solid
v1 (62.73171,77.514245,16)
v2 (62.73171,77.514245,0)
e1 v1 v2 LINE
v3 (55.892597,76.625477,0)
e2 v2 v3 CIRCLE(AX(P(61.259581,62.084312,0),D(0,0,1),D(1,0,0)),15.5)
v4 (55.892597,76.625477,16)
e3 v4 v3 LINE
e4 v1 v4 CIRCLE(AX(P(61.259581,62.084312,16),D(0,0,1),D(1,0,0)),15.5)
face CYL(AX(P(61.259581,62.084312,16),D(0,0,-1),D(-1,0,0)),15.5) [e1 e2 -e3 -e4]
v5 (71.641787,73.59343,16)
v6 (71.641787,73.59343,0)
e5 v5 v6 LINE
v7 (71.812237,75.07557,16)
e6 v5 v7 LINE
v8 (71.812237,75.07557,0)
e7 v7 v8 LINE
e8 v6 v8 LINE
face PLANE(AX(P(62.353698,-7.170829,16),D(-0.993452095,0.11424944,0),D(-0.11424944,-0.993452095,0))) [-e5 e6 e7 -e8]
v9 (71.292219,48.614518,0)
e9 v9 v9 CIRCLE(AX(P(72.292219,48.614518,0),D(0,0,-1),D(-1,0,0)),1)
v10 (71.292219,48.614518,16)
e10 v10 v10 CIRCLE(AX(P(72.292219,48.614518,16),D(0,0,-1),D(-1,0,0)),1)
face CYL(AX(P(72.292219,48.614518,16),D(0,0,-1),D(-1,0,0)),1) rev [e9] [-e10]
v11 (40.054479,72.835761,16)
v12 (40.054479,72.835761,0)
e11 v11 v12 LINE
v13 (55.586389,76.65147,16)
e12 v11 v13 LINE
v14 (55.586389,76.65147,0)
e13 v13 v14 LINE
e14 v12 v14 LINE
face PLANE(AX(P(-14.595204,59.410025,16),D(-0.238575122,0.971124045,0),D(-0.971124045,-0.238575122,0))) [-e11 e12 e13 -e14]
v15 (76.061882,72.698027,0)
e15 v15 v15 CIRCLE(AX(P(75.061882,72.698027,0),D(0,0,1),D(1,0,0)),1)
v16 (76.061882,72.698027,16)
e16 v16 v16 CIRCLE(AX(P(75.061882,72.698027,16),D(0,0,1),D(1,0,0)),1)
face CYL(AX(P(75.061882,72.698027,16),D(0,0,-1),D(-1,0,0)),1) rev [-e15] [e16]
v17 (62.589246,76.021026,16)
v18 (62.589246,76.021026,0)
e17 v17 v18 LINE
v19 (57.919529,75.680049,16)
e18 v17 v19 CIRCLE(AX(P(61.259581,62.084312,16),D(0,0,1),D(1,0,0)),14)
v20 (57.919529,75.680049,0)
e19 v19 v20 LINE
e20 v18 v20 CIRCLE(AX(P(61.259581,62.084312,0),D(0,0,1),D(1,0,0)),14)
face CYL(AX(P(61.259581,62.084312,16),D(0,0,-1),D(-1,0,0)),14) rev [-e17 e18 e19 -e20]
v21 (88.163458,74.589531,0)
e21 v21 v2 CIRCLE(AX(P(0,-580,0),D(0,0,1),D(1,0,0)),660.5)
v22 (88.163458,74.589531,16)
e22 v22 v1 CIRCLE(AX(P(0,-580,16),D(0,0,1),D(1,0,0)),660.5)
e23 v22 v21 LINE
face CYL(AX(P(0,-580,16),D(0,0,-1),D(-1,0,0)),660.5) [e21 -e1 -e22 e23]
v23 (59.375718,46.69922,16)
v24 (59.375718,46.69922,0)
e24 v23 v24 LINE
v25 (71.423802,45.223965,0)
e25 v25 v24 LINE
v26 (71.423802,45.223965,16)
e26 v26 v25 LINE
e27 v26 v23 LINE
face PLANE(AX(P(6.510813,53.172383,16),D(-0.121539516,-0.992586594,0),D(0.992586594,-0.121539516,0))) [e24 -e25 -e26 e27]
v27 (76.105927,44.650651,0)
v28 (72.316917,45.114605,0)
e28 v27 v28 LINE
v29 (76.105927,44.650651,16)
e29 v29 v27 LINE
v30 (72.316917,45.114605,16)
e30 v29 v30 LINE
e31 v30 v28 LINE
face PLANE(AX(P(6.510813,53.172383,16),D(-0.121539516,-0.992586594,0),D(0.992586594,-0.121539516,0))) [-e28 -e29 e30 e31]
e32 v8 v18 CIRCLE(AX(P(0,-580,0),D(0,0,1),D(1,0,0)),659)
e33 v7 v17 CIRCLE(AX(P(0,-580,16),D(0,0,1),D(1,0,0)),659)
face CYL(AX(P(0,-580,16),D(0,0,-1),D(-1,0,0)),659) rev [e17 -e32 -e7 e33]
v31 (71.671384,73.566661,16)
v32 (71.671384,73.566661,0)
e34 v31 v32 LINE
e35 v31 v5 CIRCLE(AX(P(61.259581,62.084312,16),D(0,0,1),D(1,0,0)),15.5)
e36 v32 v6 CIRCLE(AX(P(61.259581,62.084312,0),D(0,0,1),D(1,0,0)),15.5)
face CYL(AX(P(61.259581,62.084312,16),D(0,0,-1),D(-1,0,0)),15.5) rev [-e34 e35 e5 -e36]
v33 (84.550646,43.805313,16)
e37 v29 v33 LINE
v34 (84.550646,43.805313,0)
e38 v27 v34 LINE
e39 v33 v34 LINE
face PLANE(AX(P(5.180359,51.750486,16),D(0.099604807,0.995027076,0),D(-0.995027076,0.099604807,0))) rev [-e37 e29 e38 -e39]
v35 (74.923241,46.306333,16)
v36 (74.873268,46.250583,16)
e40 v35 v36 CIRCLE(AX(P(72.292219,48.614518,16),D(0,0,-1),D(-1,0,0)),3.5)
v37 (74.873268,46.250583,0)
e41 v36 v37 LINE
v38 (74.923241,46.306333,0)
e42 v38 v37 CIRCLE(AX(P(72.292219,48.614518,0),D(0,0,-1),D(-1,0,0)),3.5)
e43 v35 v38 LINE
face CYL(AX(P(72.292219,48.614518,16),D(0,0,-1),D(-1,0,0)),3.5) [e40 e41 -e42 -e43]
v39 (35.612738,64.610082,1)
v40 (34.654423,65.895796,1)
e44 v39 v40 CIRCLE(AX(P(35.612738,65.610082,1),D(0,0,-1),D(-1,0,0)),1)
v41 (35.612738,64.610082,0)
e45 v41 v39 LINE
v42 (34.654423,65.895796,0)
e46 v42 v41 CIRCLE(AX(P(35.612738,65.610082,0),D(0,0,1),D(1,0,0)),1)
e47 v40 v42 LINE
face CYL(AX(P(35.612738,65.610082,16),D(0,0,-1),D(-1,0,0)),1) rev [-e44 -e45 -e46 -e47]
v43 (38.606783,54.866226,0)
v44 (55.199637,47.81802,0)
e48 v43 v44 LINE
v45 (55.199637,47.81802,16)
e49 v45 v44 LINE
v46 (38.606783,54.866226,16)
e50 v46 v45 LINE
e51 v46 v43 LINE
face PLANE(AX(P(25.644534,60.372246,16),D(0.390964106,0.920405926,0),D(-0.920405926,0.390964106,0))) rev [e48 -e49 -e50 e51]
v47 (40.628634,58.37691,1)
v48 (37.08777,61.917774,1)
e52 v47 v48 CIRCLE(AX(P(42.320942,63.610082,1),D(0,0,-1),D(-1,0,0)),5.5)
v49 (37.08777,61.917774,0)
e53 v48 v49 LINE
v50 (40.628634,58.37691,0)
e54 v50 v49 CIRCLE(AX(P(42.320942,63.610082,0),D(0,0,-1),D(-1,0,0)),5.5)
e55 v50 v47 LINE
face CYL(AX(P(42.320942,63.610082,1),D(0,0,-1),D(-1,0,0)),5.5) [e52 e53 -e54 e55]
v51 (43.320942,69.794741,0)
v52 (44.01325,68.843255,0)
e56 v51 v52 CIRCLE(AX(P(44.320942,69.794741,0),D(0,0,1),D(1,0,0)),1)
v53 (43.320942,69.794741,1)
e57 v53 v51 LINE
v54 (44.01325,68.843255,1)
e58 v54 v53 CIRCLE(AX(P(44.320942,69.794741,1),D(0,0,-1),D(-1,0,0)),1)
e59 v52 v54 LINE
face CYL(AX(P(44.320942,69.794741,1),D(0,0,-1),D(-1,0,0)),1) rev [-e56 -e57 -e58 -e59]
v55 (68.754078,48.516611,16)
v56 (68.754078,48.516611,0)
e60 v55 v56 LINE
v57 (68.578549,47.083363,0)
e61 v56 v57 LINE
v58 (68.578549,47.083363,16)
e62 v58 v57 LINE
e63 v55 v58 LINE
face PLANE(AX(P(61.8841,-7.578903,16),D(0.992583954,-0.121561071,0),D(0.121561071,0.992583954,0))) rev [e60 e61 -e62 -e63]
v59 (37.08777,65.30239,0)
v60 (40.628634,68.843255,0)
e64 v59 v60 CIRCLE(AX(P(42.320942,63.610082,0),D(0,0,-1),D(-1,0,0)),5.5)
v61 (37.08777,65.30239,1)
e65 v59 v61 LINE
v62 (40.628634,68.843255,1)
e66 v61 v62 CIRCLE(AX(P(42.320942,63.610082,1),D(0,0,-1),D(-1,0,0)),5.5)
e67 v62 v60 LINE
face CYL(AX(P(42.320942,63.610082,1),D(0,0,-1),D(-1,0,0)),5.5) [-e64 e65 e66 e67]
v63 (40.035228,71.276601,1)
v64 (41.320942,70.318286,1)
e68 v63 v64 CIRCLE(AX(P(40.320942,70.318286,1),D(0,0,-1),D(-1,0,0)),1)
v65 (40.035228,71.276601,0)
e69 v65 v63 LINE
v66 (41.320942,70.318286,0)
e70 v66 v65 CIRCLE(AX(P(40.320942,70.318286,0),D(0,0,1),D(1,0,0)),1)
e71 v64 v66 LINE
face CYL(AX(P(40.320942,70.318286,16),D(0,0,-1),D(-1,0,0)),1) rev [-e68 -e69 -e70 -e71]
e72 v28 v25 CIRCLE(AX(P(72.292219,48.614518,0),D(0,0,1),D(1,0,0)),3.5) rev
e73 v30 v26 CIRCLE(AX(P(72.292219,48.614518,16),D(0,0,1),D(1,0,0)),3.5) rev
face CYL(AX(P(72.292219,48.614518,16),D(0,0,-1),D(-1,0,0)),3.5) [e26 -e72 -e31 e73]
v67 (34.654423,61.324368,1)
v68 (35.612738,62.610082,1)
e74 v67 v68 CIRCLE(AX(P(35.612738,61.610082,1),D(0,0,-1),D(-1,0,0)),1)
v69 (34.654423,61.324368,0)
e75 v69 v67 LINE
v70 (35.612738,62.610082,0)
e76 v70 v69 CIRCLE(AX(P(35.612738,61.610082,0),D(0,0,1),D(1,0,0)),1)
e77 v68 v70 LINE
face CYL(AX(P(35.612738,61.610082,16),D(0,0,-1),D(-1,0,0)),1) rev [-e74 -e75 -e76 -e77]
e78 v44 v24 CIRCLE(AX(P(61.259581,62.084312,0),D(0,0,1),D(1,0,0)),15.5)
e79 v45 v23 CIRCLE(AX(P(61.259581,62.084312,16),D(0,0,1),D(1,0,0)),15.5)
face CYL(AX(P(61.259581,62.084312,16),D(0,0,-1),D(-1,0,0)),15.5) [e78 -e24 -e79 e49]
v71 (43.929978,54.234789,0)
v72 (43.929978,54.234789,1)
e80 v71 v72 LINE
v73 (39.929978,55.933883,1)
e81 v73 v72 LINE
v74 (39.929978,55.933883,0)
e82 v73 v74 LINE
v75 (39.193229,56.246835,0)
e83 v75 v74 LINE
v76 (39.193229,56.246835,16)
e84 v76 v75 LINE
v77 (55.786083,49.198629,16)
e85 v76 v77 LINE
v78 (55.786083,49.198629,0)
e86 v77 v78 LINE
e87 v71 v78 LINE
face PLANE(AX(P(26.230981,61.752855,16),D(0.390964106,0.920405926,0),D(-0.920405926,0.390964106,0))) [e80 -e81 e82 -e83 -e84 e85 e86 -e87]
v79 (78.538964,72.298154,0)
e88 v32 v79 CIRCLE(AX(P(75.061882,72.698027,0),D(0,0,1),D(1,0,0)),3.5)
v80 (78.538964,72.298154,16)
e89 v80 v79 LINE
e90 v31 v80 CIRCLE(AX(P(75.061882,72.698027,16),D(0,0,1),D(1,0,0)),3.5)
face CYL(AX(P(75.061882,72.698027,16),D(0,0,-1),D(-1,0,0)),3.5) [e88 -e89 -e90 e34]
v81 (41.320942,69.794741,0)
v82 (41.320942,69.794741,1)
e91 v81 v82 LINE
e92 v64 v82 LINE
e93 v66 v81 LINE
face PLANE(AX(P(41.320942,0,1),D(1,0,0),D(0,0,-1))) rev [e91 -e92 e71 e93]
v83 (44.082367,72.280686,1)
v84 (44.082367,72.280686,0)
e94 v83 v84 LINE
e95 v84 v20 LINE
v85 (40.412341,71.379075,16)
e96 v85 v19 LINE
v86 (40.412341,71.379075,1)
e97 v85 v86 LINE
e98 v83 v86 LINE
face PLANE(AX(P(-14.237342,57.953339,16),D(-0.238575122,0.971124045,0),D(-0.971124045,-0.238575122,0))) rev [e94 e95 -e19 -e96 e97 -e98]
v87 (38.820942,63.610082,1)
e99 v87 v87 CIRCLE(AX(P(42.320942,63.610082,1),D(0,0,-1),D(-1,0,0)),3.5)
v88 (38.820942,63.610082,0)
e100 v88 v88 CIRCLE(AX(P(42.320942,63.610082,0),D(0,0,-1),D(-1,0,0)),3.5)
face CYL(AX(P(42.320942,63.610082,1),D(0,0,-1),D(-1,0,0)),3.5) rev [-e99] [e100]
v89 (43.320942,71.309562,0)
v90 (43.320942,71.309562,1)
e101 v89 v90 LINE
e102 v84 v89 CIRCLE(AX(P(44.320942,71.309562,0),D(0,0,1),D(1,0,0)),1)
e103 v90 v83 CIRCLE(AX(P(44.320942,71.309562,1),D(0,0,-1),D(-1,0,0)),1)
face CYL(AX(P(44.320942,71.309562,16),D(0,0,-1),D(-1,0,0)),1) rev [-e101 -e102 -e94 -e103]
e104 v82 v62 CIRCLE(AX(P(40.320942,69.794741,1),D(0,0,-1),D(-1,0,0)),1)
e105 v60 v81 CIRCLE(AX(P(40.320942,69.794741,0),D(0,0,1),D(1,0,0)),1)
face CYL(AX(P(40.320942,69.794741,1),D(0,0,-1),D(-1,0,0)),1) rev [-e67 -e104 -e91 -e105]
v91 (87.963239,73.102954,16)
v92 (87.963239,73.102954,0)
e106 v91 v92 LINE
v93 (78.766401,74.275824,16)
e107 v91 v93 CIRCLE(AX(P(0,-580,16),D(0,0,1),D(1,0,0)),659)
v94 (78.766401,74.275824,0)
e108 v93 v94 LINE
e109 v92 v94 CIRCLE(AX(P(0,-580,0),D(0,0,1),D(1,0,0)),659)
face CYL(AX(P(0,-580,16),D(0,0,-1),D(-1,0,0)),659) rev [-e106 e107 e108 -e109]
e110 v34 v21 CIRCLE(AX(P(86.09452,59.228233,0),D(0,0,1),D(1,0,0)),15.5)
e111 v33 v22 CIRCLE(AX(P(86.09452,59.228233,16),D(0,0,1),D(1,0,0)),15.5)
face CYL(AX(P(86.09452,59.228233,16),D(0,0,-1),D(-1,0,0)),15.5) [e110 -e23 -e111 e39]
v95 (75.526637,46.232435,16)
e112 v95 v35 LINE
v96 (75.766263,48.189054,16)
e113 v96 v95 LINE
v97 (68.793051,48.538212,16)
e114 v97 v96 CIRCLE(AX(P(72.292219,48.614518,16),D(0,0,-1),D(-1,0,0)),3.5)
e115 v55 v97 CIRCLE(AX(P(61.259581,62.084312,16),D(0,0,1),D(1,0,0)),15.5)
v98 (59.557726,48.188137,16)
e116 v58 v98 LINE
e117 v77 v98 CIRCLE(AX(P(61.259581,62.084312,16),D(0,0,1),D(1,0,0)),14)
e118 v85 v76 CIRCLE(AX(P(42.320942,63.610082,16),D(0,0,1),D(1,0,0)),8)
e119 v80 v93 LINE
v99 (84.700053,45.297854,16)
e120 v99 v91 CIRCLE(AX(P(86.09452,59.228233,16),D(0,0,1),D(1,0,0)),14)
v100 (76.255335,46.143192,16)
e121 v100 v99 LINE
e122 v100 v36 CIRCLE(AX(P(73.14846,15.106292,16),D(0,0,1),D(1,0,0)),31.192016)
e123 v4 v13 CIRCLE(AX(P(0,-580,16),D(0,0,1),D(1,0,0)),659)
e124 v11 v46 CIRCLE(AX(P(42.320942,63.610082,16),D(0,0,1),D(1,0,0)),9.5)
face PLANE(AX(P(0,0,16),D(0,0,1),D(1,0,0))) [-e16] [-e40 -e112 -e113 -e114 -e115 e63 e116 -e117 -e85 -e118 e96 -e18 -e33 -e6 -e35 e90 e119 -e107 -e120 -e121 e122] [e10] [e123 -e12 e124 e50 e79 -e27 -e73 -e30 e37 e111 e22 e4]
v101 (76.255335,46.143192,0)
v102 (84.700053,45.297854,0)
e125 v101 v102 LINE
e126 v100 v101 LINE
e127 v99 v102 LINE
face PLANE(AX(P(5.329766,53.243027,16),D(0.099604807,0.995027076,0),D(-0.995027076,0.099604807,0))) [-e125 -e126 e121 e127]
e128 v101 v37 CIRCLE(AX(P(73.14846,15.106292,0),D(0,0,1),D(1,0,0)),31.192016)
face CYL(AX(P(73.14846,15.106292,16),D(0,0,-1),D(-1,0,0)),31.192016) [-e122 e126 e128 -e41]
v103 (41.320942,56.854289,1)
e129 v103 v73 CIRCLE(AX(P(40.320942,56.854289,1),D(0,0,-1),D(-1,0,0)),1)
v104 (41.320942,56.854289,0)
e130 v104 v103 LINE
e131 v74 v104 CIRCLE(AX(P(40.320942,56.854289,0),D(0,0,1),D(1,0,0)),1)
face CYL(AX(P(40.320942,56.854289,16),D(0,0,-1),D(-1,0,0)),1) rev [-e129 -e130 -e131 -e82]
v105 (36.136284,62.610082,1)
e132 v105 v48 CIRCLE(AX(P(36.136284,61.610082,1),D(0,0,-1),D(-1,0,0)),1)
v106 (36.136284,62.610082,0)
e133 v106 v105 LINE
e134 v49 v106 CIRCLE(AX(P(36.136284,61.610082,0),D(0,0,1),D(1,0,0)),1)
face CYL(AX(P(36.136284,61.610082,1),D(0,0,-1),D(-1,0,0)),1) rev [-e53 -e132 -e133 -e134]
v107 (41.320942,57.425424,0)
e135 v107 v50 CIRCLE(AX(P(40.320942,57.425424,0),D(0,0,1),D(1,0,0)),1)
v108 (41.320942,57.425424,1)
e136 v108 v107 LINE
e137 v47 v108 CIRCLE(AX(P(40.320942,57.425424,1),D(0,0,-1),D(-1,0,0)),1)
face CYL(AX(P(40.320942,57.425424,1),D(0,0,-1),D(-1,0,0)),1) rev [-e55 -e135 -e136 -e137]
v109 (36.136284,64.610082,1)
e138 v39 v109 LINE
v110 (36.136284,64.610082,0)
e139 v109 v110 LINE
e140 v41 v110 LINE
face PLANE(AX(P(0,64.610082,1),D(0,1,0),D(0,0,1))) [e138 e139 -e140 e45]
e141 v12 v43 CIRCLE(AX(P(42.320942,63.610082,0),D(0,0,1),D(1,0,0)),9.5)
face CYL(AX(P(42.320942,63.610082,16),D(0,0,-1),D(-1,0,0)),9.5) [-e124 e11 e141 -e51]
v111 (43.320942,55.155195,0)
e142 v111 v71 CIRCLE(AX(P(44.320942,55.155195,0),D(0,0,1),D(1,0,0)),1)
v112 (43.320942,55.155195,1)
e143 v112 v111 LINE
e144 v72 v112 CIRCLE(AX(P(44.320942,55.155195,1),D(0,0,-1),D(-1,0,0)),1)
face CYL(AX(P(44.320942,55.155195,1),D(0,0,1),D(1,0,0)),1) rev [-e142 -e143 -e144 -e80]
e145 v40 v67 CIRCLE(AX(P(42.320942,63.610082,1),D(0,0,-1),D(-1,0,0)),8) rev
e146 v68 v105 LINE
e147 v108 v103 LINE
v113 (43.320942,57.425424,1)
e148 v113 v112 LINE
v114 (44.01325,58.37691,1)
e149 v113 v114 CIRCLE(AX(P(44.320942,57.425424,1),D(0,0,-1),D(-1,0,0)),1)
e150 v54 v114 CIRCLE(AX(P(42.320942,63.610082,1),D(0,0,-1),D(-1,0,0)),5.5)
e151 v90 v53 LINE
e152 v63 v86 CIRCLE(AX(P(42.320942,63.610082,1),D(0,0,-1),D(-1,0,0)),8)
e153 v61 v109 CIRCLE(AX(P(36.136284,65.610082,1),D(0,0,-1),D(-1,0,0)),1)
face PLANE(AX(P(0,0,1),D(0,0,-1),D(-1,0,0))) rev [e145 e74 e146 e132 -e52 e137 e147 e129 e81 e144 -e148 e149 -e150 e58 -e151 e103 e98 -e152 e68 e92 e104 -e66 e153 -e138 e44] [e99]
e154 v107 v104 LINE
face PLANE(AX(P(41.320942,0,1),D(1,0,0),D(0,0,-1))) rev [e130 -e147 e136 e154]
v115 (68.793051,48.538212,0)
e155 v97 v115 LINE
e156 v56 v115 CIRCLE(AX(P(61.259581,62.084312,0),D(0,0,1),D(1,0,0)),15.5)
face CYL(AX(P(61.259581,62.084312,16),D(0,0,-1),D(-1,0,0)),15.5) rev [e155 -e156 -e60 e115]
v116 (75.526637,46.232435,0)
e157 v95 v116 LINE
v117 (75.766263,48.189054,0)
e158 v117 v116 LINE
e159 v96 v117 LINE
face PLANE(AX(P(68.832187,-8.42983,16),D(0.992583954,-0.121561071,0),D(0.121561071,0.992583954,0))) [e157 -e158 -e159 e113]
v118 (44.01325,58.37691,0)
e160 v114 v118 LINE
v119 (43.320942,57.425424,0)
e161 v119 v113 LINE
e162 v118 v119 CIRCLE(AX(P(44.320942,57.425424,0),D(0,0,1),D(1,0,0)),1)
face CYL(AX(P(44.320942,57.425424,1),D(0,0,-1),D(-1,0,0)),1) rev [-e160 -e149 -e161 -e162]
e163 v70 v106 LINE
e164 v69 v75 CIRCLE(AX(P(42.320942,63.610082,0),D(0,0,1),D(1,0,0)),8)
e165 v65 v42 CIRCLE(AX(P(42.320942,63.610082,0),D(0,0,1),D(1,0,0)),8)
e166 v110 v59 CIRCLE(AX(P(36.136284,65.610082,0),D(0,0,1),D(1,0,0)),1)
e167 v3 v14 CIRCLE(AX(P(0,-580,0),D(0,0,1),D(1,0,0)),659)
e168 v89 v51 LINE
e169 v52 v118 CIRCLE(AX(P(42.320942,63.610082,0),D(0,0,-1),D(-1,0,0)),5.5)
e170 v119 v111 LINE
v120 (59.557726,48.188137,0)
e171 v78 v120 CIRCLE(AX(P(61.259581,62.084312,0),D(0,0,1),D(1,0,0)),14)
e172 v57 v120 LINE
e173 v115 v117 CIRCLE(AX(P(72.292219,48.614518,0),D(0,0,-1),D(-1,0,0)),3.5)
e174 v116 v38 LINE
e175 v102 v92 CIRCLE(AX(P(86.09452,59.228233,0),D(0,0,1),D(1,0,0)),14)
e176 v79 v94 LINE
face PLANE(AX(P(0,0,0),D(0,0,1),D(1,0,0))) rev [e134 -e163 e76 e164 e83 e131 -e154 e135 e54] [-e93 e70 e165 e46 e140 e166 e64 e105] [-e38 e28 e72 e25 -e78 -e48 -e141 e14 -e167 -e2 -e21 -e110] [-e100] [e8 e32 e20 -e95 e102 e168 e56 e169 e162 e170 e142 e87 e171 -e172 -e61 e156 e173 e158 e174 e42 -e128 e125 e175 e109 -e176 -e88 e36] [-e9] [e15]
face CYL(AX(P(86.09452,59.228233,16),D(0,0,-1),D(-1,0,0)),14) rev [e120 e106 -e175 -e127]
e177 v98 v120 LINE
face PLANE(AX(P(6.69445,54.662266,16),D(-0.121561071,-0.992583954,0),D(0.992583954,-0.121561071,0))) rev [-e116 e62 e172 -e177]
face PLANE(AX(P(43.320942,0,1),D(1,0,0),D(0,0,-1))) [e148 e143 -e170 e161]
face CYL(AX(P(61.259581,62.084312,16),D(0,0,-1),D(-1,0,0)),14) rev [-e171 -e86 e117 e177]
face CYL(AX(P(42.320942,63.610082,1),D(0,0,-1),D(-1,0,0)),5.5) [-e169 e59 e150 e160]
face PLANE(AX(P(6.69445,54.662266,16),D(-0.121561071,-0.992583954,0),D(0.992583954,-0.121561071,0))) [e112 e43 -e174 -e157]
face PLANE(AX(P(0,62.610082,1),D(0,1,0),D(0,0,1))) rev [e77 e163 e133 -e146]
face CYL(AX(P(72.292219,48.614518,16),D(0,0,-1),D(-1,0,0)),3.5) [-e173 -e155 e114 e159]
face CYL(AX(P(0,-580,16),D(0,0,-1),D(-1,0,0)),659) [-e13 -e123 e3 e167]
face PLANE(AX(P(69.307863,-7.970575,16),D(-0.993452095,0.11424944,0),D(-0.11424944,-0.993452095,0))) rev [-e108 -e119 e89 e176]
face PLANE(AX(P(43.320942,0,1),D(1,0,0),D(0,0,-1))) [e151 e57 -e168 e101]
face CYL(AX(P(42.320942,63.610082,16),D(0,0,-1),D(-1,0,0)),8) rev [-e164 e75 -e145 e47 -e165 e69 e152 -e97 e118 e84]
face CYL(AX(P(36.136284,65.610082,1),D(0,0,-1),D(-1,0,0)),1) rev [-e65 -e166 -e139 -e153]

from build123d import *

# Parameters (mm, degrees)
SKETCH1_R           = 0.9999999999999983
SKETCH1_R_2         = 0.9999999999999925
BOSS_EXTRUDE1_DEPTH = 16
SKETCH2_R           = 3.500000000000001
BOSS_EXTRUDE3_DEPTH = 1
FILLET1_R           = 1


with BuildPart() as part:
    # Sketch1 → Boss-Extrude1 (new body)
    with BuildSketch(Plane.XY):
        with BuildLine():
            ThreePointArc((55.89259723337368, 76.62547740283708), (55.73949455446561, 76.6384916731646), (55.58638884526515, 76.65147024516648))
            Line((55.586388845264466, 76.65147024517492), (40.05447850145701, 72.83576058817667))
            ThreePointArc((40.054478501457005, 72.83576058817668), (32.85162294085296, 64.37296720932677), (38.606783148321924, 54.86622586508078))
            Line((38.60678314832193, 54.86622586508078), (55.19963694216289, 47.81802020858516))
            ThreePointArc((55.19963694216289, 47.81802020858516), (57.2484781716781, 47.11230292338465), (59.37571808447544, 46.69921985208524))
            Line((59.375718084475444, 46.69921985208528), (71.42380227491209, 45.2239648632993))
            ThreePointArc((71.42380227491209, 45.22396486329929), (71.86683077979774, 45.14046516807511), (72.31691713492577, 45.1146053890486))
            Line((72.31691713492577, 45.11460538904862), (76.10592748748196, 44.65065142451647))
            Line((76.10592748748196, 44.65065142451647), (84.55064590566833, 43.80531307650732))
            ThreePointArc((84.55064590566833, 43.805313076507325), (101.48886829968637, 57.421563726672275), (88.16345849536586, 74.58953137529774))
            ThreePointArc((88.16345849536584, 74.58953137529784), (75.46175434404655, 76.17510896963688), (62.73170883439283, 77.5142452500271))
            ThreePointArc((62.73170883439284, 77.5142452500271), (59.262094380223, 77.45506508921636), (55.89259723337367, 76.62547740283709))
        make_face()
        with BuildLine():
            ThreePointArc((59.557725585447635, 48.18813669728694), (57.63650253765193, 48.561246371899415), (55.78608310126676, 49.19862909689187))
            Line((55.78608310126676, 49.19862909689187), (39.19322930742587, 56.24683475338757))
            ThreePointArc((39.19322930742587, 56.246834753387574), (34.34677860639931, 64.25251167485804), (40.41234118375017, 71.37907452020546))
            Line((40.41234118375017, 71.37907452020545), (57.91952888483379, 75.68004868881708))
            ThreePointArc((57.91952888483379, 75.6800486888171), (60.24003267144862, 76.04713848925702), (62.589247617854994, 76.02102564066264))
            ThreePointArc((62.589247617854994, 76.02102564066263), (67.20240478832663, 75.56451764159874), (71.81223656797964, 75.07557020476702))
            Line((71.81223656797964, 75.07557020476696), (71.64178678398153, 73.59342993840335))
            ThreePointArc((71.64178678398147, 73.59342993840333), (71.65659417306406, 73.58005511327626), (71.67138433211107, 73.56666123728807))
            ThreePointArc((71.67138433211102, 73.56666123728805), (74.42615226207305, 69.25624682134095), (78.53896424094067, 72.29815352793712))
            Line((78.53896424094067, 72.29815352793712), (78.76640123459923, 74.2758241266035))
            ThreePointArc((78.76640123459923, 74.27582412660365), (83.36688258884593, 73.70556283958138), (87.96323868046352, 73.10295408981267))
            ThreePointArc((87.96323868046352, 73.10295408981273), (99.9990926972691, 57.59640266524784), (84.70005311557539, 45.2978536909054))
            Line((84.70005311557539, 45.29785369090539), (76.25533469738902, 46.14319203891454))
            ThreePointArc((76.25533469738902, 46.14319203891455), (75.56489776696996, 46.20456627537837), (74.87326752192872, 46.25058318457722))
            ThreePointArc((74.87326752192874, 46.25058318457718), (74.89840357996093, 46.278324250051526), (74.92324149301305, 46.306332573854725))
            Line((74.92324149301308, 46.30633257385466), (75.52663710324227, 46.23243513010978))
            Line((75.52663710324227, 46.2324351301098), (75.76626292593124, 48.189054495825076))
            ThreePointArc((75.76626292593126, 48.189054495825076), (72.46724927571279, 52.11013899674976), (68.79305098926964, 48.53821211065343))
            ThreePointArc((68.79305098926967, 48.53821211065338), (68.77357245948804, 48.527397725244626), (68.75407840556292, 48.51661134884714))
            Line((68.75407840556268, 48.51661134884727), (68.57854942467414, 47.08336263050453))
            Line((68.57854942467414, 47.08336263050455), (59.55772558544767, 48.18813669728721))
        make_face(mode=Mode.SUBTRACT)
        with Locations((75.06188190763086, 72.69802656701884)):
            Circle(SKETCH1_R, mode=Mode.SUBTRACT)
        with Locations(Location((72.29221908664718, 48.614518246022456, 0), (0, 0, 180))):
            Circle(SKETCH1_R_2, mode=Mode.SUBTRACT)
    extrude(amount=BOSS_EXTRUDE1_DEPTH)

    # Sketch2 → Boss-Extrude3 (add)
    with BuildSketch(Plane(origin=(0, 0, 0), x_dir=(-1, 0, 0), z_dir=(0, 0, -1))):
        with BuildLine():
            Line((-34.38368822278696, 64.61008215769137), (-36.91261524278492, 64.61008215769137))
            ThreePointArc((-36.91261524278492, 64.61008215769137), (-38.431854859454894, 67.49916945421737), (-41.3209421559809, 69.01840907088734))
            Line((-41.3209421559809, 69.01840907088734), (-41.3209421559809, 71.60228965777424))
            Line((-41.3209421559809, 71.60228965777424), (-43.3209421559809, 72.09362775753603))
            Line((-43.3209421559809, 72.09362775753601), (-43.3209421559809, 69.01840907088734))
            ThreePointArc((-43.3209421559809, 69.01840907088734), (-47.8209421559809, 63.61008215769136), (-43.3209421559809, 58.201755244495374))
            Line((-43.3209421559809, 58.20175524449537), (-43.3209421559809, 54.49349145216626))
            Line((-43.320942155980916, 54.493491452166296), (-41.3209421559809, 55.343038581800116))
            Line((-41.3209421559809, 55.343038581800116), (-41.3209421559809, 58.20175524449537))
            ThreePointArc((-41.3209421559809, 58.201755244495374), (-38.431854859454894, 59.72099486116535), (-36.91261524278492, 62.61008215769136))
            Line((-36.91261524278492, 62.61008215769136), (-34.38368822278692, 62.61008215769136))
            ThreePointArc((-34.383688222786944, 62.6100821576915), (-34.32094215598073, 63.61008215769144), (-34.38368822278696, 64.61008215769137))
        make_face()
        with Locations((-42.3209421559809, 63.61008215769136)):
            Circle(SKETCH2_R, mode=Mode.SUBTRACT)
    extrude(amount=-BOSS_EXTRUDE3_DEPTH)

    # Fillet1
    # the kernel refuses this fillet: 1 mm, written as the material it adds along each edge
    with BuildSketch(Plane(origin=(43.3209421559809, 69.01840907088734, 0), x_dir=(0, 1, 0), z_dir=(0, 0, 1))) as fillet1_piece_1:
        with BuildLine():
            CenterArc((0.7763315252305034, -1), FILLET1_R, 90, 72.07978686060775)
            ThreePointArc((-0.17515438837357067, -0.6923076923076934), (-0.07632915836303766, -0.3489996080267872), (0, 0))
            Line((0, 0), (0.7763315252305034, 0))
        make_face()
    extrude(amount=1)
    with BuildSketch(Plane(origin=(43.3209421559809, 72.09362775753601, 0), x_dir=(0.9711240453142455, 0.23857512152882837, 0), z_dir=(0, 0, 1))) as fillet1_piece_2:
        with BuildLine():
            CenterArc((FILLET1_R * 0.784065518865, -FILLET1_R), FILLET1_R, 90.00000000000067, 76.19754186301965)
            Line((-FILLET1_R * 0.18705852645, -FILLET1_R * 0.761424878471), (0, 0))
            Line((0, 0), (FILLET1_R * 0.784065518865, 0))
        make_face()
    extrude(amount=1)
    with BuildSketch(Plane(origin=(41.3209421559809, 71.60228965777424, 0), x_dir=(-0.9693820258646232, -0.24555750432556298, 0), z_dir=(0, 0, 1))) as fillet1_piece_3:
        with BuildLine():
            CenterArc((1.2846787374655042, 0.9991324752357655), FILLET1_R, 165.78521711475895, 106.60154959902064)
            Line((0.31529671160088446, 1.2446899795613422), (0.21835850901442075, 1.2692457299938988))
            Line((0.21835850901442075, 1.2692457299938988), (-0.0969382025864637, 0.02455575043255665))
            Line((-0.0969382025864637, 0.02455575043255665), (-0.00071963623293713, -0.09999741058494188))
            ThreePointArc((-0.00071963623293713, -0.09999741058494188), (0.9348739670397286, -0.10673045549363312), (1.3304881173388574, -0.09991324752357857))
            Line((1.3304881173388574, -0.09991324752357857), (1.3263236282594648, 2e-17))
        make_face()
    extrude(amount=1)
    with BuildSketch(Plane(origin=(34.38368822278696, 64.61008215769137, 0), x_dir=(0.20605308678190415, 0.9785408143903089, 0), z_dir=(0, 0, 1))) as fillet1_piece_4:
        with BuildLine():
            CenterArc((1.2317903608426914, -0.9966225018240038), FILLET1_R, 85.28960309121933, 106.60154959901973)
            Line((0.25324954645238257, -1.202675588605908), (0, 0))
            ThreePointArc((0, 0), (0.6569548591160989, 0.02701998540798078), (1.3139097182321993, 1e-17))
        make_face()
    extrude(amount=1)
    with BuildSketch(Plane(origin=(34.38368822278693, 62.61008215769143, 0), x_dir=(0.206053086781914, -0.9785408143903069, 0), z_dir=(0, 0, 1))) as fillet1_piece_5:
        with BuildLine():
            CenterArc((1.231790360842777, 0.9966225018240046), FILLET1_R, 168.10884730976036, 106.60154959901973)
            Line((0.2532495464524701, 1.2026755886059186), (0, 0))
            ThreePointArc((0, 0), (0.6569548591161378, -0.02701998540797386), (1.3139097182322748, -1e-17))
        make_face()
    extrude(amount=1)
    with BuildSketch(Plane(origin=(41.3209421559809, 58.201755244495374, 0), x_dir=(0, -1, 0), z_dir=(0, 0, 1))) as fillet1_piece_6:
        with BuildLine():
            CenterArc((0.7763315252304963, -1), FILLET1_R, 90, 72.07978686060738)
            ThreePointArc((-0.17515438837357777, -0.6923076923076863), (-0.07632915836303766, -0.3489996080267801), (0, 0))
            Line((0, 0), (0.7763315252304963, 0))
        make_face()
    extrude(amount=1)
    with BuildSketch(Plane(origin=(41.3209421559809, 55.343038581800116, 0), x_dir=(-0.9204059255379603, 0.390964106069356, 0), z_dir=(0, 0, 1))) as fillet1_piece_7:
        with BuildLine():
            CenterArc((FILLET1_R * 1.51125070741, -FILLET1_R), FILLET1_R, 89.99999999999925, 113.0145022041728)
            Line((FILLET1_R * 0.590844781867, -FILLET1_R * 1.39096410607), (0, 0))
            Line((0, 0), (FILLET1_R * 1.51125070741, 3e-17))
        make_face()
    extrude(amount=1)
    with BuildSketch(Plane(origin=(43.32094215598091, 54.49349145216628, 0), x_dir=(0.9204059255379384, -0.3909641060694075, 0), z_dir=(0, 0, 1))) as fillet1_piece_8:
        with BuildLine():
            CenterArc((FILLET1_R * 0.661703577772, FILLET1_R), FILLET1_R, 203.01450220417283, 66.98549779582959)
            Line((-FILLET1_R * 0.258702347766, FILLET1_R * 0.609035893931), (0, 0))
            Line((0, 0), (FILLET1_R * 0.661703577772, 0))
        make_face()
    extrude(amount=1)
    with BuildSketch(Plane(origin=(36.91261524278492, 64.61008215769137, 0), x_dir=(-1, 0, 0), z_dir=(0, 0, 1))) as fillet1_piece_9:
        with BuildLine():
            CenterArc((0.7763315252305034, -1), FILLET1_R, 90, 72.07978686060696)
            ThreePointArc((-0.17515438837357067, -0.6923076923076792), (-0.07632915836303766, -0.348999608026773), (0, 0))
            Line((0, 0), (0.7763315252305034, 0))
        make_face()
    extrude(amount=1)
    with BuildSketch(Plane(origin=(43.3209421559809, 58.201755244495374, 0), x_dir=(0, -1, 0), z_dir=(0, 0, 1))) as fillet1_piece_10:
        with BuildLine():
            CenterArc((0.7763315252305034, 1), FILLET1_R, 197.92021313939225, 72.07978686060778)
            ThreePointArc((-0.17515438837357067, 0.6923076923076934), (-0.07632915836303766, 0.3489996080267872), (0, 0))
            Line((0, 0), (0.7763315252305034, 0))
        make_face()
    extrude(amount=1)
    with BuildSketch(Plane(origin=(41.3209421559809, 69.01840907088734, 0), x_dir=(-0.9694541372423533, -0.24527265600487255, 0), z_dir=(0, 0, 1))) as fillet1_piece_11:
        with BuildLine():
            CenterArc((0.779041242108754, -0.9978904650112504), FILLET1_R, 93.72226572150103, 72.07978686060773)
            Line((-0.1904128951335993, -0.7526178090063779), (0, 0))
            ThreePointArc((0, 0), (0.35706056929984037, -0.01160244243811416), (0.7141211385996942, -1e-17))
        make_face()
    extrude(amount=1)
    with BuildSketch(Plane(origin=(36.91261524278492, 62.61008215769136, 0), x_dir=(0.2452726560048725, -0.9694541372423532, 0), z_dir=(0, 0, 1))) as fillet1_piece_12:
        with BuildLine():
            CenterArc((0.7790412421087539, -0.9978904650112503), FILLET1_R, 93.72226572150103, 72.07978686060773)
            Line((-0.19041289513359927, -0.7526178090063779), (0, 0))
            ThreePointArc((0, 0), (0.3570605692998403, -0.01160244243811414), (0.7141211385996941, 2e-17))
        make_face()
    extrude(amount=1)


solid = part.part
